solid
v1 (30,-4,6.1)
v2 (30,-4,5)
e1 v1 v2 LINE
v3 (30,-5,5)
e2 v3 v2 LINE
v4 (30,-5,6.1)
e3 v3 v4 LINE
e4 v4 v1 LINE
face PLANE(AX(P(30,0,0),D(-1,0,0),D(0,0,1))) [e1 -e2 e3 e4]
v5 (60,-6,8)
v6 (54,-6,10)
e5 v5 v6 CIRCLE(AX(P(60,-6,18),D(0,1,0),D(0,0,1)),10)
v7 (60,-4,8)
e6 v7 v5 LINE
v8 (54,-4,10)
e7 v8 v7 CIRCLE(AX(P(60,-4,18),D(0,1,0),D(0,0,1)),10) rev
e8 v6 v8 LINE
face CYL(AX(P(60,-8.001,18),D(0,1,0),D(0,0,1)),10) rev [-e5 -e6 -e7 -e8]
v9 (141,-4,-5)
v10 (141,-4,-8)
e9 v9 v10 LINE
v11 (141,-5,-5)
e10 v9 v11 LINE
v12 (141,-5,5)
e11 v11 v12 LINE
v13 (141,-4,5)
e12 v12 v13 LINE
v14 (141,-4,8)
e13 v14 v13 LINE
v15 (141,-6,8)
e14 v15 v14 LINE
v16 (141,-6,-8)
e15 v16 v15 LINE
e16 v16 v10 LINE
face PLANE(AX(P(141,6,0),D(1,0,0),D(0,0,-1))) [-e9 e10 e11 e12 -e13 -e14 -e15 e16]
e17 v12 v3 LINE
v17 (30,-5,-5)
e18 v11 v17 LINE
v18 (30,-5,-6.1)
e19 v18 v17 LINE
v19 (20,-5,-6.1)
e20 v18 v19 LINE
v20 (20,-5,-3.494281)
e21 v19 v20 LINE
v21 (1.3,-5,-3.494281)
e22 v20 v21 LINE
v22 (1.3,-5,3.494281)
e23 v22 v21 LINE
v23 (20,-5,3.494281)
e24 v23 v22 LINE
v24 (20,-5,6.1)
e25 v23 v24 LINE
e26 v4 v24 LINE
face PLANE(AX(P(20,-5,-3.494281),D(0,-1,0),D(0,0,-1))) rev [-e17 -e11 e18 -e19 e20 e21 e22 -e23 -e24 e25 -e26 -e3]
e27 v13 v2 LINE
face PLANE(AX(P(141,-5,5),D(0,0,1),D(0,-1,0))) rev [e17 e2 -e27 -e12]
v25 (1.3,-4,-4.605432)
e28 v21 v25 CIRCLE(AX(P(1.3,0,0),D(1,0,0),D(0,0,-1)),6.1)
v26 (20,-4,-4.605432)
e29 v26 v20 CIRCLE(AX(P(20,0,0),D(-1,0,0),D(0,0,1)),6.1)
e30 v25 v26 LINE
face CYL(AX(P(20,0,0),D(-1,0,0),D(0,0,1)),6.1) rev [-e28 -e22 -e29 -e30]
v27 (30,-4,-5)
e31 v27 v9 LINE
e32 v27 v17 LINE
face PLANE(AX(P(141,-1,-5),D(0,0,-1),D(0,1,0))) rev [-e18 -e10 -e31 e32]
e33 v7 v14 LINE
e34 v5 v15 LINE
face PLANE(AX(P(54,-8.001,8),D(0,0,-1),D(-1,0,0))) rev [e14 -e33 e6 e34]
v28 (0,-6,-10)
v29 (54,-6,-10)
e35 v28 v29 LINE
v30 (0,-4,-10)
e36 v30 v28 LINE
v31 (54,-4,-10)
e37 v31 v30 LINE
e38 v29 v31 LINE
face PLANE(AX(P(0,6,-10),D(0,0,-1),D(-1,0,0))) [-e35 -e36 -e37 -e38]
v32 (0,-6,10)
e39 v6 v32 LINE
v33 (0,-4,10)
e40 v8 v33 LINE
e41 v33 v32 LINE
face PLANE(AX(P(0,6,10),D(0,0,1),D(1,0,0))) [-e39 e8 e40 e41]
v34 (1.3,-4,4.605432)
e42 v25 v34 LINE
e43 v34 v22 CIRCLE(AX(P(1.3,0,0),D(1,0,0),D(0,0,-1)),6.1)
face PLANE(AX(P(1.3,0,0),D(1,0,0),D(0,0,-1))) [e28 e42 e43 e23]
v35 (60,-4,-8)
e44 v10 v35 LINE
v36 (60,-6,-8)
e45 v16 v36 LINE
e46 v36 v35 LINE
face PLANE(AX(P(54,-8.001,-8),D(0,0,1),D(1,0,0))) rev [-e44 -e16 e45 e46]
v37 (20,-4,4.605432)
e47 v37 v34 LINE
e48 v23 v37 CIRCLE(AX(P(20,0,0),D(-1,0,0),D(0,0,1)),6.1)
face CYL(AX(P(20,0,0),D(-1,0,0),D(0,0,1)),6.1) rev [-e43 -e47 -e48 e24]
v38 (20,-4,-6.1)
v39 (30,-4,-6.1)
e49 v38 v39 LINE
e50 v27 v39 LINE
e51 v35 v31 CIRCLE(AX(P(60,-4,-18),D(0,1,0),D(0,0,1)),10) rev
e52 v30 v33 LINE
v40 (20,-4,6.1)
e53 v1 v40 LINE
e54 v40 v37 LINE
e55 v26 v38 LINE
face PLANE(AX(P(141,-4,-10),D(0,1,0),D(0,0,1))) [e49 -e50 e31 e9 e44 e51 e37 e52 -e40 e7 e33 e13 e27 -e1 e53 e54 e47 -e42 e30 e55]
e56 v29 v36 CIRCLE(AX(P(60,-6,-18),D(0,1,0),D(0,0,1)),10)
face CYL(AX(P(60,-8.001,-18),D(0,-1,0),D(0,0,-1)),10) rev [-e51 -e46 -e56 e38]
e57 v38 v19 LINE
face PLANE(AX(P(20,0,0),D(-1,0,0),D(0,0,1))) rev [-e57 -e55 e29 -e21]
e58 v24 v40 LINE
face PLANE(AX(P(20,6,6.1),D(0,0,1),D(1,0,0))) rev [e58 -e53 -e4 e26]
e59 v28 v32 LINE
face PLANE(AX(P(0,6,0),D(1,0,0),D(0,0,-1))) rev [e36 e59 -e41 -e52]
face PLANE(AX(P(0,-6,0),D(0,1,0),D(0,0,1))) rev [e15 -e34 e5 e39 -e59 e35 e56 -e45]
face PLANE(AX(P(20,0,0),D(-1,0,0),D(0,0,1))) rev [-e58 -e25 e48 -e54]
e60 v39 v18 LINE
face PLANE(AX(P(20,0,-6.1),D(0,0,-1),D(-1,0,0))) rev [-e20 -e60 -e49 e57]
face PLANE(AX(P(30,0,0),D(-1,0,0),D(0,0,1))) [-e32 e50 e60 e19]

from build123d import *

# Parameters (mm, degrees)
SKETCH1_R               = 2
BOSS_EXTRUDE1_DEPTH     = 4
BOSS_EXTRUDE2_DEPTH     = 6
CUT_EXTRUDE1_START      = -2
CUT_EXTRUDE1_DEPTH      = 18
SKETCH4_W               = 12.2
SKETCH4_H               = 11
CUT_EXTRUDE2_DEPTH      = 10
SKETCH5_W               = 20
SKETCH5_H               = 2
BOSS_EXTRUDE3_DEPTH     = 35
CUT_EXTRUDE4_START      = -0.7
CUT_EXTRUDE4_DEPTH      = 0.7
CUT_EXTRUDE5_DEPTH      = 1
CUT_EXTRUDE6_REACH      = 144.046
SKETCH12_W              = 87
SKETCH12_H              = 2
FILLET1_R               = 10
CUT_EXTRUDE7_DEPTH      = 112.736296699
SKETCH14_W              = 20
SKETCH14_H              = 2
CUT_EXTRUDE8_DEPTH      = 142.58036587
FILLET2_R               = 10
CUT_EXTRUDE9_DEPTH      = 142.58036587
CUT_EXTRUDE9_DEPTH_BACK = 142.58036587
SKETCH15_W              = 20
SKETCH15_H              = 8
CUT_EXTRUDE10_REACH     = 143.58
SKETCH16_W              = 20
SKETCH16_H              = 2


with BuildPart() as part:
    # Sketch1 → Boss-Extrude1 (new, symmetric)
    with BuildSketch(Plane(origin=(0, 0, 0), x_dir=(1, 0, 0), z_dir=(0, 1, 0))):
        with BuildLine():
            ThreePointArc((-4, 7.5), (-11.5, 0), (-4, -7.5))
            Line((-4, -7.5), (0, -7.5))
            Line((0, -7.5), (0, 7.5))
            Line((0, 7.5), (-4, 7.5))
        make_face()
        with Locations(Location((-4, 0, 0), (0, 0, 270))):
            Circle(SKETCH1_R, mode=Mode.SUBTRACT)
    extrude(amount=BOSS_EXTRUDE1_DEPTH, both=True)

    # Sketch1<3> → Boss-Extrude2 (add, symmetric)
    with BuildSketch(Plane(origin=(0, 0, 0), x_dir=(1, 0, 0), z_dir=(0, 1, 0))):
        Polygon((0, 10), (0, 7.5), (0, 0), (141, 0), (141, 10), align=None)
        Polygon((0, 0), (0, -7.5), (0, -10), (141, -10), (141, 0), align=None)
    extrude(amount=BOSS_EXTRUDE2_DEPTH, both=True)

    # Sketch3 → Cut-Extrude1 (cut)
    with BuildSketch(Plane.ZY.offset(CUT_EXTRUDE1_START)):
        with BuildLine():
            Line((-3.494281042, -5), (3.494281042, -5))
            ThreePointArc((3.494281042, -5), (5.4094877, -2.819120931), (6.1, 0))
            Line((6.1, 0), (6.1, 6))
            Line((6.1, 6), (-6.1, 6))
            Line((-6.1, 6), (-6.1, 0))
            ThreePointArc((-6.1, 0), (-5.4094877, -2.819120931), (-3.494281042, -5))
        make_face()
    extrude(amount=-CUT_EXTRUDE1_DEPTH, mode=Mode.SUBTRACT)

    # Sketch4 → Cut-Extrude2 (cut)
    with BuildSketch(Plane.ZY.offset(-20)):
        with Locations((0, 0.5)):
            Rectangle(SKETCH4_W, SKETCH4_H)
    extrude(amount=-CUT_EXTRUDE2_DEPTH, mode=Mode.SUBTRACT)

    # Sketch5 → Boss-Extrude3 (add)
    with BuildSketch(Plane.ZY):
        with Locations((0, -7)):
            Rectangle(SKETCH5_W, SKETCH5_H)
    extrude(amount=-BOSS_EXTRUDE3_DEPTH)

    # Sketch9 → Cut-Extrude4 (cut)
    with BuildSketch(Plane(origin=(2, 0, 0), x_dir=(0, 0, -1), z_dir=(1, 0, 0)).offset(CUT_EXTRUDE4_START)):
        with BuildLine():
            Line((3.494281042, -5), (-3.494281042, -5))
            ThreePointArc((-3.494281042, -5), (-6.1, 0), (-3.494281042, 5))
            Line((-3.494281042, 5), (3.494281042, 5))
            ThreePointArc((3.494281042, 5), (6.1, 0), (3.494281042, -5))
        make_face()
    extrude(amount=CUT_EXTRUDE4_DEPTH, mode=Mode.SUBTRACT)

    # Sketch11 → Cut-Extrude5 (cut, symmetric)
    with BuildSketch(Plane(origin=(0, 0, 0), x_dir=(1, 0, 0), z_dir=(0, 1, 0))):
        with BuildLine():
            Line((2, 1), (2, -1))
            ThreePointArc((2, -1), (0.585786391, -1.585786484), (0, -3.000000131))
            Line((0, -3.000000131), (0, -7.5))
            Line((0, -7.5), (-2, -7.5))
            Line((-2, -7.5), (-2, -3.000000131))
            ThreePointArc((-2, -3.000000131), (-0.828427171, -0.171572922), (2, 1))
        make_face()
    extrude(amount=CUT_EXTRUDE5_DEPTH, both=True, mode=Mode.SUBTRACT)

    # Sketch12 → Cut-Extrude6 (cut, up to next)
    with BuildSketch(Plane(origin=(0, 6, 0), x_dir=(1, 0, 0), z_dir=(0, 1, 0)), mode=Mode.PRIVATE) as cut_extrude6_sk1:
        with Locations((97.5, 9)):
            Rectangle(SKETCH12_W, SKETCH12_H)
    cut_extrude6_tool1 = extrude(cut_extrude6_sk1.sketch, amount=-CUT_EXTRUDE6_REACH, mode=Mode.PRIVATE) & part.part
    # Sketch12 → Cut-Extrude6 (cut, up to next)
    with BuildSketch(Plane(origin=(0, 6, 0), x_dir=(1, 0, 0), z_dir=(0, 1, 0)), mode=Mode.PRIVATE) as cut_extrude6_sk2:
        with Locations((97.5, -9)):
            Rectangle(SKETCH12_W, SKETCH12_H)
    cut_extrude6_tool2 = extrude(cut_extrude6_sk2.sketch, amount=-CUT_EXTRUDE6_REACH, mode=Mode.PRIVATE) & part.part
    add(cut_extrude6_tool1.solids().sort_by_distance((97.5, 6, -9))[0], mode=Mode.SUBTRACT)
    add(cut_extrude6_tool2.solids().sort_by_distance((97.5, 6, 9))[0], mode=Mode.SUBTRACT)

    # Fillet1
    # the kernel refuses this fillet: 10 mm, written as the material it adds along each edge
    with BuildSketch(Plane(origin=(54, 6, 8), x_dir=(0, 0, 1), z_dir=(0, -1, 0))) as fillet1_piece_1:
        with BuildLine():
            CenterArc((10, -6), FILLET1_R, 143.130102354, 36.869897646)
            Line((0, -6), (-0.2, -6))
            Line((-0.2, -6), (-0.2, 0))
            Line((-0.2, 0), (0, 0.2))
            ThreePointArc((0, 0.2), (1, 0.2), (1.84, 0.12))
            Line((1.84, 0.12), (2, 0))
        make_face()
    extrude(amount=12)
    with BuildSketch(Plane(origin=(54, 6, -8), x_dir=(0, 0, -1), z_dir=(0, -1, 0))) as fillet1_piece_2:
        with BuildLine():
            CenterArc((10, 6), FILLET1_R, 180, 36.869897646)
            Line((0, 6), (-0.2, 6))
            Line((-0.2, 6), (-0.2, 0))
            Line((-0.2, 0), (0, -0.2))
            ThreePointArc((0, -0.2), (1, -0.2), (1.84, -0.12))
            Line((1.84, -0.12), (2, 0))
        make_face()
    extrude(amount=12)

    # Sketch13 → Cut-Extrude7 (cut, through all)
    with BuildSketch(Plane.ZY.offset(-30)):
        Polygon((-5, 5), (-5, 1), (-3.5, 1), (-3.5, -1), (-5, -1), (-5, -5), (5, -5), (5, -1), (3.5, -1), (3.5, 1), (5, 1), (5, 5), align=None)
    extrude(amount=-CUT_EXTRUDE7_DEPTH, mode=Mode.SUBTRACT)

    # Sketch14 → Cut-Extrude8 (cut, through all)
    with BuildSketch(Plane.ZY):
        with Locations((0, 5)):
            Rectangle(SKETCH14_W, SKETCH14_H)
    extrude(amount=-CUT_EXTRUDE8_DEPTH, mode=Mode.SUBTRACT)

    # Fillet2
    # the kernel refuses this fillet: 10 mm, written as the material it adds along each edge
    with BuildSketch(Plane(origin=(35, -6, -10), x_dir=(1, 0, 0), z_dir=(0, 0, 1))) as fillet2_piece_1:
        with BuildLine():
            CenterArc((6, -10), FILLET2_R, 90, 36.869897646)
            Line((0, -2), (-0.12, -1.84))
            ThreePointArc((-0.12, -1.84), (-0.2, -1), (-0.2, 0))
            Line((-0.2, 0), (0, 0.2))
            Line((0, 0.2), (6, 0.2))
            Line((6, 0.2), (6, 0))
        make_face()
    extrude(amount=20)

    # Sketch15 → Cut-Extrude9 (cut, two sides: drawn at the far end of the back side and taken through both)
    with BuildSketch(Plane(origin=(0, 0, 0), x_dir=(0, 0, -1), z_dir=(1, 0, 0)).offset(-CUT_EXTRUDE9_DEPTH_BACK)):
        Rectangle(SKETCH15_W, SKETCH15_H)
    extrude(amount=CUT_EXTRUDE9_DEPTH + CUT_EXTRUDE9_DEPTH_BACK, mode=Mode.SUBTRACT)

    # Sketch16 → Cut-Extrude10 (cut, up to next)
    with BuildSketch(Plane(origin=(0, 0, 0), x_dir=(0, 0, -1), z_dir=(1, 0, 0)), mode=Mode.PRIVATE) as cut_extrude10_sk1:
        with Locations((0, -7)):
            Rectangle(SKETCH16_W, SKETCH16_H)
    cut_extrude10_tool1 = extrude(cut_extrude10_sk1.sketch, amount=CUT_EXTRUDE10_REACH, mode=Mode.PRIVATE) & part.part
    add(cut_extrude10_tool1.solids().sort_by_distance((0, -7, 0))[0], mode=Mode.SUBTRACT)


solid = part.part
